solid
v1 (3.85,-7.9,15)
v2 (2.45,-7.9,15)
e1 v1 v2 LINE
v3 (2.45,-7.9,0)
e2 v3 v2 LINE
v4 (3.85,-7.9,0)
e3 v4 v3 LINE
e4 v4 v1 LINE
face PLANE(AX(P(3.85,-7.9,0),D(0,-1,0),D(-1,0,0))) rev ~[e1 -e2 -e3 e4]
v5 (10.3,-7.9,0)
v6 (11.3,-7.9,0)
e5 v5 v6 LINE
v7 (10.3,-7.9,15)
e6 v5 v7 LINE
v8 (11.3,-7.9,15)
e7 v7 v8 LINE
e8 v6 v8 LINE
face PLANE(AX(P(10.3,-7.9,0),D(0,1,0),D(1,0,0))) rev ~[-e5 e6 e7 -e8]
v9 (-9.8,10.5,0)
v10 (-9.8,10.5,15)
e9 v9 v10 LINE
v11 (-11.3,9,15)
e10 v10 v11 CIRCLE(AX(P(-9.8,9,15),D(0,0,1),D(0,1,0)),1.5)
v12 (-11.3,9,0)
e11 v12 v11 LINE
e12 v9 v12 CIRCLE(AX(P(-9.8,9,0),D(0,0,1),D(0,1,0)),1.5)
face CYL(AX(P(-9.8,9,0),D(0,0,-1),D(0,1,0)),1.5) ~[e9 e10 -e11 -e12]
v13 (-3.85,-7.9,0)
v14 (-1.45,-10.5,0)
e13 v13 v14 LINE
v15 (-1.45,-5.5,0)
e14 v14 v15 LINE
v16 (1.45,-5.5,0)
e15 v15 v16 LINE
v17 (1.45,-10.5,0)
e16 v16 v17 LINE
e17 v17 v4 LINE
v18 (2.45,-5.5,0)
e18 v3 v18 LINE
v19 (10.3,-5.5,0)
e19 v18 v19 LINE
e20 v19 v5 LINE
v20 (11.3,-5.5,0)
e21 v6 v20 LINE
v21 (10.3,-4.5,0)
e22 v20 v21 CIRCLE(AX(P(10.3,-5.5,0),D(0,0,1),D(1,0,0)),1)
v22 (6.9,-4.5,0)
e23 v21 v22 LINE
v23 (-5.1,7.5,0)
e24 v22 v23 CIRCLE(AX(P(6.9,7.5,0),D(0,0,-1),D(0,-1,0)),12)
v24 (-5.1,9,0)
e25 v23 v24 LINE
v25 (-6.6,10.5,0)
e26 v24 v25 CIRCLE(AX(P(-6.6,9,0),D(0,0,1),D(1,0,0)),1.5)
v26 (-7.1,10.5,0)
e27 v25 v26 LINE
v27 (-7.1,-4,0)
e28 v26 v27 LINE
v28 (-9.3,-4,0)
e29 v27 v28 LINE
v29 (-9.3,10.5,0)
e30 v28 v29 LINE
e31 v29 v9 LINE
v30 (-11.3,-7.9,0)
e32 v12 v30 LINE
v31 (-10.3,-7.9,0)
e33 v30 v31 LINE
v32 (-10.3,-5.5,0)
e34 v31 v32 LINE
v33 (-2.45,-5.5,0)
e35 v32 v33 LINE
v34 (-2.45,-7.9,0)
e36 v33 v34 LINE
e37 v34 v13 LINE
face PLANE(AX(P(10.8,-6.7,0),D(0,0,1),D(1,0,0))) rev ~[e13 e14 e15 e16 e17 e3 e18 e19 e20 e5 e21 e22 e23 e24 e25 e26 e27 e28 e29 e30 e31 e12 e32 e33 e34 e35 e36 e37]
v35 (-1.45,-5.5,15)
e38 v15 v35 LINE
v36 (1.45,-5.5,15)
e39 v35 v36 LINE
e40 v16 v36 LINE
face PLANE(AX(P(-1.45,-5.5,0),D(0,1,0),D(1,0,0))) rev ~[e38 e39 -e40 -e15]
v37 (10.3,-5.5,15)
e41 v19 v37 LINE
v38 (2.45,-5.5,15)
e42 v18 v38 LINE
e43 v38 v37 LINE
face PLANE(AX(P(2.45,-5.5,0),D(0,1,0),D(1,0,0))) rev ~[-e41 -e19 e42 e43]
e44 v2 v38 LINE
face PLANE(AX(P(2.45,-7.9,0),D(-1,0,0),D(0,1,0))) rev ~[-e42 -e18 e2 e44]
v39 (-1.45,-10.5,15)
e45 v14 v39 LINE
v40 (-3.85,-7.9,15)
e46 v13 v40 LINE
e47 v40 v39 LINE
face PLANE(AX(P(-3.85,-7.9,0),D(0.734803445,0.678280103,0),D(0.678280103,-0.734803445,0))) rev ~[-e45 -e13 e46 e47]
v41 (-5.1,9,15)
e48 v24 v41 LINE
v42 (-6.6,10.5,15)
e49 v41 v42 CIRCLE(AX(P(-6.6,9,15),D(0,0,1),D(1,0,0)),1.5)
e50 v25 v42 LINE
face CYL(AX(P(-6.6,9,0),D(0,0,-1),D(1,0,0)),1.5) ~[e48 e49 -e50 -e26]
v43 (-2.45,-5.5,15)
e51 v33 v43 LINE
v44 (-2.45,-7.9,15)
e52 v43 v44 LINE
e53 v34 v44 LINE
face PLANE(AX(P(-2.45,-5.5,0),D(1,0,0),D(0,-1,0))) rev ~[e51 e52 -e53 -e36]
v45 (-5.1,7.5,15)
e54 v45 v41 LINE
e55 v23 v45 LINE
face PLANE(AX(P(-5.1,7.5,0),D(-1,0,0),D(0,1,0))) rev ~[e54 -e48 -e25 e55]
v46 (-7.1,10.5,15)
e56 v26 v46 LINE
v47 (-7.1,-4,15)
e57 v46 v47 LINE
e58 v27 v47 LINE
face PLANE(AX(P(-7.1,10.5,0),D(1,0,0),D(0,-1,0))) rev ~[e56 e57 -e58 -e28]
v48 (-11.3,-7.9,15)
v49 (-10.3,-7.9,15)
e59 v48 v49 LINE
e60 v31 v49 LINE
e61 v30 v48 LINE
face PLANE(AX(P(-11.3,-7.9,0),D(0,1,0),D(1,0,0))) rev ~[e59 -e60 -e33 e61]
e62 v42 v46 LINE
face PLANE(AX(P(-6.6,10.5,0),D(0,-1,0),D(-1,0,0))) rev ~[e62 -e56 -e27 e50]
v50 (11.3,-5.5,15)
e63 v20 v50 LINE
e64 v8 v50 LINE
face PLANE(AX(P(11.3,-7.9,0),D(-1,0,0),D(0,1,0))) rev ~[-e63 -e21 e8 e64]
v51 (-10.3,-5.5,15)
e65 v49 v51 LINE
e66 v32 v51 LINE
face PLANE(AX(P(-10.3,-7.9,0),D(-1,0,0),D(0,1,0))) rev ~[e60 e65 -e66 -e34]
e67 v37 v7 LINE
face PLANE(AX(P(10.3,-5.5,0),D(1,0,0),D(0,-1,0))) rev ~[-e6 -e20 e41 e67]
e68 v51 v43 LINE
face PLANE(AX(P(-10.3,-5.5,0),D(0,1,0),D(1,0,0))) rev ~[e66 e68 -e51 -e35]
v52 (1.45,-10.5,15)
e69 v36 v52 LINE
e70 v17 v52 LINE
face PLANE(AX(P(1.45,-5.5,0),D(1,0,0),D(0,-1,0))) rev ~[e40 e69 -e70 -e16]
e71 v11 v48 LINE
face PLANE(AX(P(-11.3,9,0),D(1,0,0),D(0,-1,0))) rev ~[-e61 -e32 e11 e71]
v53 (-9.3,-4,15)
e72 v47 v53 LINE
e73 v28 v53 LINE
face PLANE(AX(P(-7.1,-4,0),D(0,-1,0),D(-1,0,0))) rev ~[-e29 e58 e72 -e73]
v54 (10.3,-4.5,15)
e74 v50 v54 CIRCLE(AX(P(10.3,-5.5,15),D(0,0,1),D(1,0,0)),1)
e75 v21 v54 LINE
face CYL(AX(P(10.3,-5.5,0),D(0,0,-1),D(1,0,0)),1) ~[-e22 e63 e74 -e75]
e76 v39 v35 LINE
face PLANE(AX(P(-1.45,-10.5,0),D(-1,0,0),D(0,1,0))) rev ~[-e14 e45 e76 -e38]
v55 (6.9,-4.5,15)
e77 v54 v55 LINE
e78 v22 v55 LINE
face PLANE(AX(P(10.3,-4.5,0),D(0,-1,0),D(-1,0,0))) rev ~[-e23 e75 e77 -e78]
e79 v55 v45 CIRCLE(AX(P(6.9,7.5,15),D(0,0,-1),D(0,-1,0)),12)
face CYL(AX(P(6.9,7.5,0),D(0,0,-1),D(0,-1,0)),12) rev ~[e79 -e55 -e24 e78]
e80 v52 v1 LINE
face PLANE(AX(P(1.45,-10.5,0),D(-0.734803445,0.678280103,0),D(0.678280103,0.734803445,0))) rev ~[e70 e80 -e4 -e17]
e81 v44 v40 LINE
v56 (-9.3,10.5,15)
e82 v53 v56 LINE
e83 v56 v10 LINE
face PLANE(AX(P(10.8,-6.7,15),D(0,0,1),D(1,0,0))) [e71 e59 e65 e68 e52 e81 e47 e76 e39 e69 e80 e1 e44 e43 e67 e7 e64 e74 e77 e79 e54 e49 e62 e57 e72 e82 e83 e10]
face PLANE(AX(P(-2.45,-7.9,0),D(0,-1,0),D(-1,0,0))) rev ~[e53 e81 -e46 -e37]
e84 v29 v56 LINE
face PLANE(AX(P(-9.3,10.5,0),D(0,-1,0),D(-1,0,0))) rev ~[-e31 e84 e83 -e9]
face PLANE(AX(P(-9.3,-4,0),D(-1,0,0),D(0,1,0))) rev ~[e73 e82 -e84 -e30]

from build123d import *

# Parameters (mm, degrees)
F0_W     = 1
F0_H     = 2.4
F1_DEPTH = 15


# Not quite as in the source:
# - a feature names something its author has since deleted; it is built from what else it names


with BuildPart() as f1:
    # F0 (on Top) → F1 (new body)
    with BuildSketch(Plane.XY):
        with Locations((10.8, -6.7)):
            Rectangle(F0_W, F0_H)
        with Locations((-10.8, -6.7)):
            Rectangle(F0_W, F0_H)
        Polygon((-2.45, -8.5), (-2.45, -7.9), (-3.85, -7.9), (-1.45, -10.5), (-1.45, -8.5), align=None)
        with BuildLine():
            Line((10.3, -4.5), (10.3, -5.5))
            Line((10.3, -5.5), (11.3, -5.5))
            ThreePointArc((11.3, -5.5), (11.0071067812, -4.7928932188), (10.3, -4.5))
        make_face()
        Polygon((-1.45, -5.5), (-2.45, -5.5), (-2.45, -7.9), (-2.45, -8.5), (-1.45, -8.5), align=None)
        Polygon((2.45, -5.5), (1.45, -5.5), (1.45, -8.5), (2.45, -8.5), (2.45, -7.9), align=None)
        with BuildLine():
            Line((-11.3, -5.5), (-10.3, -5.5))
            Line((-10.3, -5.5), (-2.45, -5.5))
            Line((-2.45, -5.5), (-1.45, -5.5))
            Line((-1.45, -5.5), (1.45, -5.5))
            Line((1.45, -5.5), (2.45, -5.5))
            Line((2.45, -5.5), (10.3, -5.5))
            Line((10.3, -5.5), (10.3, -4.5))
            Line((10.3, -4.5), (6.9, -4.5))
            ThreePointArc((6.9, -4.5), (-1.5852813742, -0.9852813742), (-5.1, 7.5))
            Line((-5.1, 7.5), (-5.1, 9))
            ThreePointArc((-5.1, 9), (-5.5393398282, 10.0606601718), (-6.6, 10.5))
            Line((-6.6, 10.5), (-7.1, 10.5))
            Line((-7.1, 10.5), (-7.1, -4))
            Line((-7.1, -4), (-9.3, -4))
            Line((-9.3, -4), (-9.3, 10.5))
            Line((-9.3, 10.5), (-9.8, 10.5))
            ThreePointArc((-9.8, 10.5), (-10.8606601718, 10.0606601718), (-11.3, 9))
            Line((-11.3, 9), (-11.3, -5.5))
        make_face()
        Polygon((2.45, -8.5), (1.45, -8.5), (1.45, -10.5), (3.85, -7.9), (2.45, -7.9), align=None)
    extrude(amount=F1_DEPTH)


solid = f1.part
